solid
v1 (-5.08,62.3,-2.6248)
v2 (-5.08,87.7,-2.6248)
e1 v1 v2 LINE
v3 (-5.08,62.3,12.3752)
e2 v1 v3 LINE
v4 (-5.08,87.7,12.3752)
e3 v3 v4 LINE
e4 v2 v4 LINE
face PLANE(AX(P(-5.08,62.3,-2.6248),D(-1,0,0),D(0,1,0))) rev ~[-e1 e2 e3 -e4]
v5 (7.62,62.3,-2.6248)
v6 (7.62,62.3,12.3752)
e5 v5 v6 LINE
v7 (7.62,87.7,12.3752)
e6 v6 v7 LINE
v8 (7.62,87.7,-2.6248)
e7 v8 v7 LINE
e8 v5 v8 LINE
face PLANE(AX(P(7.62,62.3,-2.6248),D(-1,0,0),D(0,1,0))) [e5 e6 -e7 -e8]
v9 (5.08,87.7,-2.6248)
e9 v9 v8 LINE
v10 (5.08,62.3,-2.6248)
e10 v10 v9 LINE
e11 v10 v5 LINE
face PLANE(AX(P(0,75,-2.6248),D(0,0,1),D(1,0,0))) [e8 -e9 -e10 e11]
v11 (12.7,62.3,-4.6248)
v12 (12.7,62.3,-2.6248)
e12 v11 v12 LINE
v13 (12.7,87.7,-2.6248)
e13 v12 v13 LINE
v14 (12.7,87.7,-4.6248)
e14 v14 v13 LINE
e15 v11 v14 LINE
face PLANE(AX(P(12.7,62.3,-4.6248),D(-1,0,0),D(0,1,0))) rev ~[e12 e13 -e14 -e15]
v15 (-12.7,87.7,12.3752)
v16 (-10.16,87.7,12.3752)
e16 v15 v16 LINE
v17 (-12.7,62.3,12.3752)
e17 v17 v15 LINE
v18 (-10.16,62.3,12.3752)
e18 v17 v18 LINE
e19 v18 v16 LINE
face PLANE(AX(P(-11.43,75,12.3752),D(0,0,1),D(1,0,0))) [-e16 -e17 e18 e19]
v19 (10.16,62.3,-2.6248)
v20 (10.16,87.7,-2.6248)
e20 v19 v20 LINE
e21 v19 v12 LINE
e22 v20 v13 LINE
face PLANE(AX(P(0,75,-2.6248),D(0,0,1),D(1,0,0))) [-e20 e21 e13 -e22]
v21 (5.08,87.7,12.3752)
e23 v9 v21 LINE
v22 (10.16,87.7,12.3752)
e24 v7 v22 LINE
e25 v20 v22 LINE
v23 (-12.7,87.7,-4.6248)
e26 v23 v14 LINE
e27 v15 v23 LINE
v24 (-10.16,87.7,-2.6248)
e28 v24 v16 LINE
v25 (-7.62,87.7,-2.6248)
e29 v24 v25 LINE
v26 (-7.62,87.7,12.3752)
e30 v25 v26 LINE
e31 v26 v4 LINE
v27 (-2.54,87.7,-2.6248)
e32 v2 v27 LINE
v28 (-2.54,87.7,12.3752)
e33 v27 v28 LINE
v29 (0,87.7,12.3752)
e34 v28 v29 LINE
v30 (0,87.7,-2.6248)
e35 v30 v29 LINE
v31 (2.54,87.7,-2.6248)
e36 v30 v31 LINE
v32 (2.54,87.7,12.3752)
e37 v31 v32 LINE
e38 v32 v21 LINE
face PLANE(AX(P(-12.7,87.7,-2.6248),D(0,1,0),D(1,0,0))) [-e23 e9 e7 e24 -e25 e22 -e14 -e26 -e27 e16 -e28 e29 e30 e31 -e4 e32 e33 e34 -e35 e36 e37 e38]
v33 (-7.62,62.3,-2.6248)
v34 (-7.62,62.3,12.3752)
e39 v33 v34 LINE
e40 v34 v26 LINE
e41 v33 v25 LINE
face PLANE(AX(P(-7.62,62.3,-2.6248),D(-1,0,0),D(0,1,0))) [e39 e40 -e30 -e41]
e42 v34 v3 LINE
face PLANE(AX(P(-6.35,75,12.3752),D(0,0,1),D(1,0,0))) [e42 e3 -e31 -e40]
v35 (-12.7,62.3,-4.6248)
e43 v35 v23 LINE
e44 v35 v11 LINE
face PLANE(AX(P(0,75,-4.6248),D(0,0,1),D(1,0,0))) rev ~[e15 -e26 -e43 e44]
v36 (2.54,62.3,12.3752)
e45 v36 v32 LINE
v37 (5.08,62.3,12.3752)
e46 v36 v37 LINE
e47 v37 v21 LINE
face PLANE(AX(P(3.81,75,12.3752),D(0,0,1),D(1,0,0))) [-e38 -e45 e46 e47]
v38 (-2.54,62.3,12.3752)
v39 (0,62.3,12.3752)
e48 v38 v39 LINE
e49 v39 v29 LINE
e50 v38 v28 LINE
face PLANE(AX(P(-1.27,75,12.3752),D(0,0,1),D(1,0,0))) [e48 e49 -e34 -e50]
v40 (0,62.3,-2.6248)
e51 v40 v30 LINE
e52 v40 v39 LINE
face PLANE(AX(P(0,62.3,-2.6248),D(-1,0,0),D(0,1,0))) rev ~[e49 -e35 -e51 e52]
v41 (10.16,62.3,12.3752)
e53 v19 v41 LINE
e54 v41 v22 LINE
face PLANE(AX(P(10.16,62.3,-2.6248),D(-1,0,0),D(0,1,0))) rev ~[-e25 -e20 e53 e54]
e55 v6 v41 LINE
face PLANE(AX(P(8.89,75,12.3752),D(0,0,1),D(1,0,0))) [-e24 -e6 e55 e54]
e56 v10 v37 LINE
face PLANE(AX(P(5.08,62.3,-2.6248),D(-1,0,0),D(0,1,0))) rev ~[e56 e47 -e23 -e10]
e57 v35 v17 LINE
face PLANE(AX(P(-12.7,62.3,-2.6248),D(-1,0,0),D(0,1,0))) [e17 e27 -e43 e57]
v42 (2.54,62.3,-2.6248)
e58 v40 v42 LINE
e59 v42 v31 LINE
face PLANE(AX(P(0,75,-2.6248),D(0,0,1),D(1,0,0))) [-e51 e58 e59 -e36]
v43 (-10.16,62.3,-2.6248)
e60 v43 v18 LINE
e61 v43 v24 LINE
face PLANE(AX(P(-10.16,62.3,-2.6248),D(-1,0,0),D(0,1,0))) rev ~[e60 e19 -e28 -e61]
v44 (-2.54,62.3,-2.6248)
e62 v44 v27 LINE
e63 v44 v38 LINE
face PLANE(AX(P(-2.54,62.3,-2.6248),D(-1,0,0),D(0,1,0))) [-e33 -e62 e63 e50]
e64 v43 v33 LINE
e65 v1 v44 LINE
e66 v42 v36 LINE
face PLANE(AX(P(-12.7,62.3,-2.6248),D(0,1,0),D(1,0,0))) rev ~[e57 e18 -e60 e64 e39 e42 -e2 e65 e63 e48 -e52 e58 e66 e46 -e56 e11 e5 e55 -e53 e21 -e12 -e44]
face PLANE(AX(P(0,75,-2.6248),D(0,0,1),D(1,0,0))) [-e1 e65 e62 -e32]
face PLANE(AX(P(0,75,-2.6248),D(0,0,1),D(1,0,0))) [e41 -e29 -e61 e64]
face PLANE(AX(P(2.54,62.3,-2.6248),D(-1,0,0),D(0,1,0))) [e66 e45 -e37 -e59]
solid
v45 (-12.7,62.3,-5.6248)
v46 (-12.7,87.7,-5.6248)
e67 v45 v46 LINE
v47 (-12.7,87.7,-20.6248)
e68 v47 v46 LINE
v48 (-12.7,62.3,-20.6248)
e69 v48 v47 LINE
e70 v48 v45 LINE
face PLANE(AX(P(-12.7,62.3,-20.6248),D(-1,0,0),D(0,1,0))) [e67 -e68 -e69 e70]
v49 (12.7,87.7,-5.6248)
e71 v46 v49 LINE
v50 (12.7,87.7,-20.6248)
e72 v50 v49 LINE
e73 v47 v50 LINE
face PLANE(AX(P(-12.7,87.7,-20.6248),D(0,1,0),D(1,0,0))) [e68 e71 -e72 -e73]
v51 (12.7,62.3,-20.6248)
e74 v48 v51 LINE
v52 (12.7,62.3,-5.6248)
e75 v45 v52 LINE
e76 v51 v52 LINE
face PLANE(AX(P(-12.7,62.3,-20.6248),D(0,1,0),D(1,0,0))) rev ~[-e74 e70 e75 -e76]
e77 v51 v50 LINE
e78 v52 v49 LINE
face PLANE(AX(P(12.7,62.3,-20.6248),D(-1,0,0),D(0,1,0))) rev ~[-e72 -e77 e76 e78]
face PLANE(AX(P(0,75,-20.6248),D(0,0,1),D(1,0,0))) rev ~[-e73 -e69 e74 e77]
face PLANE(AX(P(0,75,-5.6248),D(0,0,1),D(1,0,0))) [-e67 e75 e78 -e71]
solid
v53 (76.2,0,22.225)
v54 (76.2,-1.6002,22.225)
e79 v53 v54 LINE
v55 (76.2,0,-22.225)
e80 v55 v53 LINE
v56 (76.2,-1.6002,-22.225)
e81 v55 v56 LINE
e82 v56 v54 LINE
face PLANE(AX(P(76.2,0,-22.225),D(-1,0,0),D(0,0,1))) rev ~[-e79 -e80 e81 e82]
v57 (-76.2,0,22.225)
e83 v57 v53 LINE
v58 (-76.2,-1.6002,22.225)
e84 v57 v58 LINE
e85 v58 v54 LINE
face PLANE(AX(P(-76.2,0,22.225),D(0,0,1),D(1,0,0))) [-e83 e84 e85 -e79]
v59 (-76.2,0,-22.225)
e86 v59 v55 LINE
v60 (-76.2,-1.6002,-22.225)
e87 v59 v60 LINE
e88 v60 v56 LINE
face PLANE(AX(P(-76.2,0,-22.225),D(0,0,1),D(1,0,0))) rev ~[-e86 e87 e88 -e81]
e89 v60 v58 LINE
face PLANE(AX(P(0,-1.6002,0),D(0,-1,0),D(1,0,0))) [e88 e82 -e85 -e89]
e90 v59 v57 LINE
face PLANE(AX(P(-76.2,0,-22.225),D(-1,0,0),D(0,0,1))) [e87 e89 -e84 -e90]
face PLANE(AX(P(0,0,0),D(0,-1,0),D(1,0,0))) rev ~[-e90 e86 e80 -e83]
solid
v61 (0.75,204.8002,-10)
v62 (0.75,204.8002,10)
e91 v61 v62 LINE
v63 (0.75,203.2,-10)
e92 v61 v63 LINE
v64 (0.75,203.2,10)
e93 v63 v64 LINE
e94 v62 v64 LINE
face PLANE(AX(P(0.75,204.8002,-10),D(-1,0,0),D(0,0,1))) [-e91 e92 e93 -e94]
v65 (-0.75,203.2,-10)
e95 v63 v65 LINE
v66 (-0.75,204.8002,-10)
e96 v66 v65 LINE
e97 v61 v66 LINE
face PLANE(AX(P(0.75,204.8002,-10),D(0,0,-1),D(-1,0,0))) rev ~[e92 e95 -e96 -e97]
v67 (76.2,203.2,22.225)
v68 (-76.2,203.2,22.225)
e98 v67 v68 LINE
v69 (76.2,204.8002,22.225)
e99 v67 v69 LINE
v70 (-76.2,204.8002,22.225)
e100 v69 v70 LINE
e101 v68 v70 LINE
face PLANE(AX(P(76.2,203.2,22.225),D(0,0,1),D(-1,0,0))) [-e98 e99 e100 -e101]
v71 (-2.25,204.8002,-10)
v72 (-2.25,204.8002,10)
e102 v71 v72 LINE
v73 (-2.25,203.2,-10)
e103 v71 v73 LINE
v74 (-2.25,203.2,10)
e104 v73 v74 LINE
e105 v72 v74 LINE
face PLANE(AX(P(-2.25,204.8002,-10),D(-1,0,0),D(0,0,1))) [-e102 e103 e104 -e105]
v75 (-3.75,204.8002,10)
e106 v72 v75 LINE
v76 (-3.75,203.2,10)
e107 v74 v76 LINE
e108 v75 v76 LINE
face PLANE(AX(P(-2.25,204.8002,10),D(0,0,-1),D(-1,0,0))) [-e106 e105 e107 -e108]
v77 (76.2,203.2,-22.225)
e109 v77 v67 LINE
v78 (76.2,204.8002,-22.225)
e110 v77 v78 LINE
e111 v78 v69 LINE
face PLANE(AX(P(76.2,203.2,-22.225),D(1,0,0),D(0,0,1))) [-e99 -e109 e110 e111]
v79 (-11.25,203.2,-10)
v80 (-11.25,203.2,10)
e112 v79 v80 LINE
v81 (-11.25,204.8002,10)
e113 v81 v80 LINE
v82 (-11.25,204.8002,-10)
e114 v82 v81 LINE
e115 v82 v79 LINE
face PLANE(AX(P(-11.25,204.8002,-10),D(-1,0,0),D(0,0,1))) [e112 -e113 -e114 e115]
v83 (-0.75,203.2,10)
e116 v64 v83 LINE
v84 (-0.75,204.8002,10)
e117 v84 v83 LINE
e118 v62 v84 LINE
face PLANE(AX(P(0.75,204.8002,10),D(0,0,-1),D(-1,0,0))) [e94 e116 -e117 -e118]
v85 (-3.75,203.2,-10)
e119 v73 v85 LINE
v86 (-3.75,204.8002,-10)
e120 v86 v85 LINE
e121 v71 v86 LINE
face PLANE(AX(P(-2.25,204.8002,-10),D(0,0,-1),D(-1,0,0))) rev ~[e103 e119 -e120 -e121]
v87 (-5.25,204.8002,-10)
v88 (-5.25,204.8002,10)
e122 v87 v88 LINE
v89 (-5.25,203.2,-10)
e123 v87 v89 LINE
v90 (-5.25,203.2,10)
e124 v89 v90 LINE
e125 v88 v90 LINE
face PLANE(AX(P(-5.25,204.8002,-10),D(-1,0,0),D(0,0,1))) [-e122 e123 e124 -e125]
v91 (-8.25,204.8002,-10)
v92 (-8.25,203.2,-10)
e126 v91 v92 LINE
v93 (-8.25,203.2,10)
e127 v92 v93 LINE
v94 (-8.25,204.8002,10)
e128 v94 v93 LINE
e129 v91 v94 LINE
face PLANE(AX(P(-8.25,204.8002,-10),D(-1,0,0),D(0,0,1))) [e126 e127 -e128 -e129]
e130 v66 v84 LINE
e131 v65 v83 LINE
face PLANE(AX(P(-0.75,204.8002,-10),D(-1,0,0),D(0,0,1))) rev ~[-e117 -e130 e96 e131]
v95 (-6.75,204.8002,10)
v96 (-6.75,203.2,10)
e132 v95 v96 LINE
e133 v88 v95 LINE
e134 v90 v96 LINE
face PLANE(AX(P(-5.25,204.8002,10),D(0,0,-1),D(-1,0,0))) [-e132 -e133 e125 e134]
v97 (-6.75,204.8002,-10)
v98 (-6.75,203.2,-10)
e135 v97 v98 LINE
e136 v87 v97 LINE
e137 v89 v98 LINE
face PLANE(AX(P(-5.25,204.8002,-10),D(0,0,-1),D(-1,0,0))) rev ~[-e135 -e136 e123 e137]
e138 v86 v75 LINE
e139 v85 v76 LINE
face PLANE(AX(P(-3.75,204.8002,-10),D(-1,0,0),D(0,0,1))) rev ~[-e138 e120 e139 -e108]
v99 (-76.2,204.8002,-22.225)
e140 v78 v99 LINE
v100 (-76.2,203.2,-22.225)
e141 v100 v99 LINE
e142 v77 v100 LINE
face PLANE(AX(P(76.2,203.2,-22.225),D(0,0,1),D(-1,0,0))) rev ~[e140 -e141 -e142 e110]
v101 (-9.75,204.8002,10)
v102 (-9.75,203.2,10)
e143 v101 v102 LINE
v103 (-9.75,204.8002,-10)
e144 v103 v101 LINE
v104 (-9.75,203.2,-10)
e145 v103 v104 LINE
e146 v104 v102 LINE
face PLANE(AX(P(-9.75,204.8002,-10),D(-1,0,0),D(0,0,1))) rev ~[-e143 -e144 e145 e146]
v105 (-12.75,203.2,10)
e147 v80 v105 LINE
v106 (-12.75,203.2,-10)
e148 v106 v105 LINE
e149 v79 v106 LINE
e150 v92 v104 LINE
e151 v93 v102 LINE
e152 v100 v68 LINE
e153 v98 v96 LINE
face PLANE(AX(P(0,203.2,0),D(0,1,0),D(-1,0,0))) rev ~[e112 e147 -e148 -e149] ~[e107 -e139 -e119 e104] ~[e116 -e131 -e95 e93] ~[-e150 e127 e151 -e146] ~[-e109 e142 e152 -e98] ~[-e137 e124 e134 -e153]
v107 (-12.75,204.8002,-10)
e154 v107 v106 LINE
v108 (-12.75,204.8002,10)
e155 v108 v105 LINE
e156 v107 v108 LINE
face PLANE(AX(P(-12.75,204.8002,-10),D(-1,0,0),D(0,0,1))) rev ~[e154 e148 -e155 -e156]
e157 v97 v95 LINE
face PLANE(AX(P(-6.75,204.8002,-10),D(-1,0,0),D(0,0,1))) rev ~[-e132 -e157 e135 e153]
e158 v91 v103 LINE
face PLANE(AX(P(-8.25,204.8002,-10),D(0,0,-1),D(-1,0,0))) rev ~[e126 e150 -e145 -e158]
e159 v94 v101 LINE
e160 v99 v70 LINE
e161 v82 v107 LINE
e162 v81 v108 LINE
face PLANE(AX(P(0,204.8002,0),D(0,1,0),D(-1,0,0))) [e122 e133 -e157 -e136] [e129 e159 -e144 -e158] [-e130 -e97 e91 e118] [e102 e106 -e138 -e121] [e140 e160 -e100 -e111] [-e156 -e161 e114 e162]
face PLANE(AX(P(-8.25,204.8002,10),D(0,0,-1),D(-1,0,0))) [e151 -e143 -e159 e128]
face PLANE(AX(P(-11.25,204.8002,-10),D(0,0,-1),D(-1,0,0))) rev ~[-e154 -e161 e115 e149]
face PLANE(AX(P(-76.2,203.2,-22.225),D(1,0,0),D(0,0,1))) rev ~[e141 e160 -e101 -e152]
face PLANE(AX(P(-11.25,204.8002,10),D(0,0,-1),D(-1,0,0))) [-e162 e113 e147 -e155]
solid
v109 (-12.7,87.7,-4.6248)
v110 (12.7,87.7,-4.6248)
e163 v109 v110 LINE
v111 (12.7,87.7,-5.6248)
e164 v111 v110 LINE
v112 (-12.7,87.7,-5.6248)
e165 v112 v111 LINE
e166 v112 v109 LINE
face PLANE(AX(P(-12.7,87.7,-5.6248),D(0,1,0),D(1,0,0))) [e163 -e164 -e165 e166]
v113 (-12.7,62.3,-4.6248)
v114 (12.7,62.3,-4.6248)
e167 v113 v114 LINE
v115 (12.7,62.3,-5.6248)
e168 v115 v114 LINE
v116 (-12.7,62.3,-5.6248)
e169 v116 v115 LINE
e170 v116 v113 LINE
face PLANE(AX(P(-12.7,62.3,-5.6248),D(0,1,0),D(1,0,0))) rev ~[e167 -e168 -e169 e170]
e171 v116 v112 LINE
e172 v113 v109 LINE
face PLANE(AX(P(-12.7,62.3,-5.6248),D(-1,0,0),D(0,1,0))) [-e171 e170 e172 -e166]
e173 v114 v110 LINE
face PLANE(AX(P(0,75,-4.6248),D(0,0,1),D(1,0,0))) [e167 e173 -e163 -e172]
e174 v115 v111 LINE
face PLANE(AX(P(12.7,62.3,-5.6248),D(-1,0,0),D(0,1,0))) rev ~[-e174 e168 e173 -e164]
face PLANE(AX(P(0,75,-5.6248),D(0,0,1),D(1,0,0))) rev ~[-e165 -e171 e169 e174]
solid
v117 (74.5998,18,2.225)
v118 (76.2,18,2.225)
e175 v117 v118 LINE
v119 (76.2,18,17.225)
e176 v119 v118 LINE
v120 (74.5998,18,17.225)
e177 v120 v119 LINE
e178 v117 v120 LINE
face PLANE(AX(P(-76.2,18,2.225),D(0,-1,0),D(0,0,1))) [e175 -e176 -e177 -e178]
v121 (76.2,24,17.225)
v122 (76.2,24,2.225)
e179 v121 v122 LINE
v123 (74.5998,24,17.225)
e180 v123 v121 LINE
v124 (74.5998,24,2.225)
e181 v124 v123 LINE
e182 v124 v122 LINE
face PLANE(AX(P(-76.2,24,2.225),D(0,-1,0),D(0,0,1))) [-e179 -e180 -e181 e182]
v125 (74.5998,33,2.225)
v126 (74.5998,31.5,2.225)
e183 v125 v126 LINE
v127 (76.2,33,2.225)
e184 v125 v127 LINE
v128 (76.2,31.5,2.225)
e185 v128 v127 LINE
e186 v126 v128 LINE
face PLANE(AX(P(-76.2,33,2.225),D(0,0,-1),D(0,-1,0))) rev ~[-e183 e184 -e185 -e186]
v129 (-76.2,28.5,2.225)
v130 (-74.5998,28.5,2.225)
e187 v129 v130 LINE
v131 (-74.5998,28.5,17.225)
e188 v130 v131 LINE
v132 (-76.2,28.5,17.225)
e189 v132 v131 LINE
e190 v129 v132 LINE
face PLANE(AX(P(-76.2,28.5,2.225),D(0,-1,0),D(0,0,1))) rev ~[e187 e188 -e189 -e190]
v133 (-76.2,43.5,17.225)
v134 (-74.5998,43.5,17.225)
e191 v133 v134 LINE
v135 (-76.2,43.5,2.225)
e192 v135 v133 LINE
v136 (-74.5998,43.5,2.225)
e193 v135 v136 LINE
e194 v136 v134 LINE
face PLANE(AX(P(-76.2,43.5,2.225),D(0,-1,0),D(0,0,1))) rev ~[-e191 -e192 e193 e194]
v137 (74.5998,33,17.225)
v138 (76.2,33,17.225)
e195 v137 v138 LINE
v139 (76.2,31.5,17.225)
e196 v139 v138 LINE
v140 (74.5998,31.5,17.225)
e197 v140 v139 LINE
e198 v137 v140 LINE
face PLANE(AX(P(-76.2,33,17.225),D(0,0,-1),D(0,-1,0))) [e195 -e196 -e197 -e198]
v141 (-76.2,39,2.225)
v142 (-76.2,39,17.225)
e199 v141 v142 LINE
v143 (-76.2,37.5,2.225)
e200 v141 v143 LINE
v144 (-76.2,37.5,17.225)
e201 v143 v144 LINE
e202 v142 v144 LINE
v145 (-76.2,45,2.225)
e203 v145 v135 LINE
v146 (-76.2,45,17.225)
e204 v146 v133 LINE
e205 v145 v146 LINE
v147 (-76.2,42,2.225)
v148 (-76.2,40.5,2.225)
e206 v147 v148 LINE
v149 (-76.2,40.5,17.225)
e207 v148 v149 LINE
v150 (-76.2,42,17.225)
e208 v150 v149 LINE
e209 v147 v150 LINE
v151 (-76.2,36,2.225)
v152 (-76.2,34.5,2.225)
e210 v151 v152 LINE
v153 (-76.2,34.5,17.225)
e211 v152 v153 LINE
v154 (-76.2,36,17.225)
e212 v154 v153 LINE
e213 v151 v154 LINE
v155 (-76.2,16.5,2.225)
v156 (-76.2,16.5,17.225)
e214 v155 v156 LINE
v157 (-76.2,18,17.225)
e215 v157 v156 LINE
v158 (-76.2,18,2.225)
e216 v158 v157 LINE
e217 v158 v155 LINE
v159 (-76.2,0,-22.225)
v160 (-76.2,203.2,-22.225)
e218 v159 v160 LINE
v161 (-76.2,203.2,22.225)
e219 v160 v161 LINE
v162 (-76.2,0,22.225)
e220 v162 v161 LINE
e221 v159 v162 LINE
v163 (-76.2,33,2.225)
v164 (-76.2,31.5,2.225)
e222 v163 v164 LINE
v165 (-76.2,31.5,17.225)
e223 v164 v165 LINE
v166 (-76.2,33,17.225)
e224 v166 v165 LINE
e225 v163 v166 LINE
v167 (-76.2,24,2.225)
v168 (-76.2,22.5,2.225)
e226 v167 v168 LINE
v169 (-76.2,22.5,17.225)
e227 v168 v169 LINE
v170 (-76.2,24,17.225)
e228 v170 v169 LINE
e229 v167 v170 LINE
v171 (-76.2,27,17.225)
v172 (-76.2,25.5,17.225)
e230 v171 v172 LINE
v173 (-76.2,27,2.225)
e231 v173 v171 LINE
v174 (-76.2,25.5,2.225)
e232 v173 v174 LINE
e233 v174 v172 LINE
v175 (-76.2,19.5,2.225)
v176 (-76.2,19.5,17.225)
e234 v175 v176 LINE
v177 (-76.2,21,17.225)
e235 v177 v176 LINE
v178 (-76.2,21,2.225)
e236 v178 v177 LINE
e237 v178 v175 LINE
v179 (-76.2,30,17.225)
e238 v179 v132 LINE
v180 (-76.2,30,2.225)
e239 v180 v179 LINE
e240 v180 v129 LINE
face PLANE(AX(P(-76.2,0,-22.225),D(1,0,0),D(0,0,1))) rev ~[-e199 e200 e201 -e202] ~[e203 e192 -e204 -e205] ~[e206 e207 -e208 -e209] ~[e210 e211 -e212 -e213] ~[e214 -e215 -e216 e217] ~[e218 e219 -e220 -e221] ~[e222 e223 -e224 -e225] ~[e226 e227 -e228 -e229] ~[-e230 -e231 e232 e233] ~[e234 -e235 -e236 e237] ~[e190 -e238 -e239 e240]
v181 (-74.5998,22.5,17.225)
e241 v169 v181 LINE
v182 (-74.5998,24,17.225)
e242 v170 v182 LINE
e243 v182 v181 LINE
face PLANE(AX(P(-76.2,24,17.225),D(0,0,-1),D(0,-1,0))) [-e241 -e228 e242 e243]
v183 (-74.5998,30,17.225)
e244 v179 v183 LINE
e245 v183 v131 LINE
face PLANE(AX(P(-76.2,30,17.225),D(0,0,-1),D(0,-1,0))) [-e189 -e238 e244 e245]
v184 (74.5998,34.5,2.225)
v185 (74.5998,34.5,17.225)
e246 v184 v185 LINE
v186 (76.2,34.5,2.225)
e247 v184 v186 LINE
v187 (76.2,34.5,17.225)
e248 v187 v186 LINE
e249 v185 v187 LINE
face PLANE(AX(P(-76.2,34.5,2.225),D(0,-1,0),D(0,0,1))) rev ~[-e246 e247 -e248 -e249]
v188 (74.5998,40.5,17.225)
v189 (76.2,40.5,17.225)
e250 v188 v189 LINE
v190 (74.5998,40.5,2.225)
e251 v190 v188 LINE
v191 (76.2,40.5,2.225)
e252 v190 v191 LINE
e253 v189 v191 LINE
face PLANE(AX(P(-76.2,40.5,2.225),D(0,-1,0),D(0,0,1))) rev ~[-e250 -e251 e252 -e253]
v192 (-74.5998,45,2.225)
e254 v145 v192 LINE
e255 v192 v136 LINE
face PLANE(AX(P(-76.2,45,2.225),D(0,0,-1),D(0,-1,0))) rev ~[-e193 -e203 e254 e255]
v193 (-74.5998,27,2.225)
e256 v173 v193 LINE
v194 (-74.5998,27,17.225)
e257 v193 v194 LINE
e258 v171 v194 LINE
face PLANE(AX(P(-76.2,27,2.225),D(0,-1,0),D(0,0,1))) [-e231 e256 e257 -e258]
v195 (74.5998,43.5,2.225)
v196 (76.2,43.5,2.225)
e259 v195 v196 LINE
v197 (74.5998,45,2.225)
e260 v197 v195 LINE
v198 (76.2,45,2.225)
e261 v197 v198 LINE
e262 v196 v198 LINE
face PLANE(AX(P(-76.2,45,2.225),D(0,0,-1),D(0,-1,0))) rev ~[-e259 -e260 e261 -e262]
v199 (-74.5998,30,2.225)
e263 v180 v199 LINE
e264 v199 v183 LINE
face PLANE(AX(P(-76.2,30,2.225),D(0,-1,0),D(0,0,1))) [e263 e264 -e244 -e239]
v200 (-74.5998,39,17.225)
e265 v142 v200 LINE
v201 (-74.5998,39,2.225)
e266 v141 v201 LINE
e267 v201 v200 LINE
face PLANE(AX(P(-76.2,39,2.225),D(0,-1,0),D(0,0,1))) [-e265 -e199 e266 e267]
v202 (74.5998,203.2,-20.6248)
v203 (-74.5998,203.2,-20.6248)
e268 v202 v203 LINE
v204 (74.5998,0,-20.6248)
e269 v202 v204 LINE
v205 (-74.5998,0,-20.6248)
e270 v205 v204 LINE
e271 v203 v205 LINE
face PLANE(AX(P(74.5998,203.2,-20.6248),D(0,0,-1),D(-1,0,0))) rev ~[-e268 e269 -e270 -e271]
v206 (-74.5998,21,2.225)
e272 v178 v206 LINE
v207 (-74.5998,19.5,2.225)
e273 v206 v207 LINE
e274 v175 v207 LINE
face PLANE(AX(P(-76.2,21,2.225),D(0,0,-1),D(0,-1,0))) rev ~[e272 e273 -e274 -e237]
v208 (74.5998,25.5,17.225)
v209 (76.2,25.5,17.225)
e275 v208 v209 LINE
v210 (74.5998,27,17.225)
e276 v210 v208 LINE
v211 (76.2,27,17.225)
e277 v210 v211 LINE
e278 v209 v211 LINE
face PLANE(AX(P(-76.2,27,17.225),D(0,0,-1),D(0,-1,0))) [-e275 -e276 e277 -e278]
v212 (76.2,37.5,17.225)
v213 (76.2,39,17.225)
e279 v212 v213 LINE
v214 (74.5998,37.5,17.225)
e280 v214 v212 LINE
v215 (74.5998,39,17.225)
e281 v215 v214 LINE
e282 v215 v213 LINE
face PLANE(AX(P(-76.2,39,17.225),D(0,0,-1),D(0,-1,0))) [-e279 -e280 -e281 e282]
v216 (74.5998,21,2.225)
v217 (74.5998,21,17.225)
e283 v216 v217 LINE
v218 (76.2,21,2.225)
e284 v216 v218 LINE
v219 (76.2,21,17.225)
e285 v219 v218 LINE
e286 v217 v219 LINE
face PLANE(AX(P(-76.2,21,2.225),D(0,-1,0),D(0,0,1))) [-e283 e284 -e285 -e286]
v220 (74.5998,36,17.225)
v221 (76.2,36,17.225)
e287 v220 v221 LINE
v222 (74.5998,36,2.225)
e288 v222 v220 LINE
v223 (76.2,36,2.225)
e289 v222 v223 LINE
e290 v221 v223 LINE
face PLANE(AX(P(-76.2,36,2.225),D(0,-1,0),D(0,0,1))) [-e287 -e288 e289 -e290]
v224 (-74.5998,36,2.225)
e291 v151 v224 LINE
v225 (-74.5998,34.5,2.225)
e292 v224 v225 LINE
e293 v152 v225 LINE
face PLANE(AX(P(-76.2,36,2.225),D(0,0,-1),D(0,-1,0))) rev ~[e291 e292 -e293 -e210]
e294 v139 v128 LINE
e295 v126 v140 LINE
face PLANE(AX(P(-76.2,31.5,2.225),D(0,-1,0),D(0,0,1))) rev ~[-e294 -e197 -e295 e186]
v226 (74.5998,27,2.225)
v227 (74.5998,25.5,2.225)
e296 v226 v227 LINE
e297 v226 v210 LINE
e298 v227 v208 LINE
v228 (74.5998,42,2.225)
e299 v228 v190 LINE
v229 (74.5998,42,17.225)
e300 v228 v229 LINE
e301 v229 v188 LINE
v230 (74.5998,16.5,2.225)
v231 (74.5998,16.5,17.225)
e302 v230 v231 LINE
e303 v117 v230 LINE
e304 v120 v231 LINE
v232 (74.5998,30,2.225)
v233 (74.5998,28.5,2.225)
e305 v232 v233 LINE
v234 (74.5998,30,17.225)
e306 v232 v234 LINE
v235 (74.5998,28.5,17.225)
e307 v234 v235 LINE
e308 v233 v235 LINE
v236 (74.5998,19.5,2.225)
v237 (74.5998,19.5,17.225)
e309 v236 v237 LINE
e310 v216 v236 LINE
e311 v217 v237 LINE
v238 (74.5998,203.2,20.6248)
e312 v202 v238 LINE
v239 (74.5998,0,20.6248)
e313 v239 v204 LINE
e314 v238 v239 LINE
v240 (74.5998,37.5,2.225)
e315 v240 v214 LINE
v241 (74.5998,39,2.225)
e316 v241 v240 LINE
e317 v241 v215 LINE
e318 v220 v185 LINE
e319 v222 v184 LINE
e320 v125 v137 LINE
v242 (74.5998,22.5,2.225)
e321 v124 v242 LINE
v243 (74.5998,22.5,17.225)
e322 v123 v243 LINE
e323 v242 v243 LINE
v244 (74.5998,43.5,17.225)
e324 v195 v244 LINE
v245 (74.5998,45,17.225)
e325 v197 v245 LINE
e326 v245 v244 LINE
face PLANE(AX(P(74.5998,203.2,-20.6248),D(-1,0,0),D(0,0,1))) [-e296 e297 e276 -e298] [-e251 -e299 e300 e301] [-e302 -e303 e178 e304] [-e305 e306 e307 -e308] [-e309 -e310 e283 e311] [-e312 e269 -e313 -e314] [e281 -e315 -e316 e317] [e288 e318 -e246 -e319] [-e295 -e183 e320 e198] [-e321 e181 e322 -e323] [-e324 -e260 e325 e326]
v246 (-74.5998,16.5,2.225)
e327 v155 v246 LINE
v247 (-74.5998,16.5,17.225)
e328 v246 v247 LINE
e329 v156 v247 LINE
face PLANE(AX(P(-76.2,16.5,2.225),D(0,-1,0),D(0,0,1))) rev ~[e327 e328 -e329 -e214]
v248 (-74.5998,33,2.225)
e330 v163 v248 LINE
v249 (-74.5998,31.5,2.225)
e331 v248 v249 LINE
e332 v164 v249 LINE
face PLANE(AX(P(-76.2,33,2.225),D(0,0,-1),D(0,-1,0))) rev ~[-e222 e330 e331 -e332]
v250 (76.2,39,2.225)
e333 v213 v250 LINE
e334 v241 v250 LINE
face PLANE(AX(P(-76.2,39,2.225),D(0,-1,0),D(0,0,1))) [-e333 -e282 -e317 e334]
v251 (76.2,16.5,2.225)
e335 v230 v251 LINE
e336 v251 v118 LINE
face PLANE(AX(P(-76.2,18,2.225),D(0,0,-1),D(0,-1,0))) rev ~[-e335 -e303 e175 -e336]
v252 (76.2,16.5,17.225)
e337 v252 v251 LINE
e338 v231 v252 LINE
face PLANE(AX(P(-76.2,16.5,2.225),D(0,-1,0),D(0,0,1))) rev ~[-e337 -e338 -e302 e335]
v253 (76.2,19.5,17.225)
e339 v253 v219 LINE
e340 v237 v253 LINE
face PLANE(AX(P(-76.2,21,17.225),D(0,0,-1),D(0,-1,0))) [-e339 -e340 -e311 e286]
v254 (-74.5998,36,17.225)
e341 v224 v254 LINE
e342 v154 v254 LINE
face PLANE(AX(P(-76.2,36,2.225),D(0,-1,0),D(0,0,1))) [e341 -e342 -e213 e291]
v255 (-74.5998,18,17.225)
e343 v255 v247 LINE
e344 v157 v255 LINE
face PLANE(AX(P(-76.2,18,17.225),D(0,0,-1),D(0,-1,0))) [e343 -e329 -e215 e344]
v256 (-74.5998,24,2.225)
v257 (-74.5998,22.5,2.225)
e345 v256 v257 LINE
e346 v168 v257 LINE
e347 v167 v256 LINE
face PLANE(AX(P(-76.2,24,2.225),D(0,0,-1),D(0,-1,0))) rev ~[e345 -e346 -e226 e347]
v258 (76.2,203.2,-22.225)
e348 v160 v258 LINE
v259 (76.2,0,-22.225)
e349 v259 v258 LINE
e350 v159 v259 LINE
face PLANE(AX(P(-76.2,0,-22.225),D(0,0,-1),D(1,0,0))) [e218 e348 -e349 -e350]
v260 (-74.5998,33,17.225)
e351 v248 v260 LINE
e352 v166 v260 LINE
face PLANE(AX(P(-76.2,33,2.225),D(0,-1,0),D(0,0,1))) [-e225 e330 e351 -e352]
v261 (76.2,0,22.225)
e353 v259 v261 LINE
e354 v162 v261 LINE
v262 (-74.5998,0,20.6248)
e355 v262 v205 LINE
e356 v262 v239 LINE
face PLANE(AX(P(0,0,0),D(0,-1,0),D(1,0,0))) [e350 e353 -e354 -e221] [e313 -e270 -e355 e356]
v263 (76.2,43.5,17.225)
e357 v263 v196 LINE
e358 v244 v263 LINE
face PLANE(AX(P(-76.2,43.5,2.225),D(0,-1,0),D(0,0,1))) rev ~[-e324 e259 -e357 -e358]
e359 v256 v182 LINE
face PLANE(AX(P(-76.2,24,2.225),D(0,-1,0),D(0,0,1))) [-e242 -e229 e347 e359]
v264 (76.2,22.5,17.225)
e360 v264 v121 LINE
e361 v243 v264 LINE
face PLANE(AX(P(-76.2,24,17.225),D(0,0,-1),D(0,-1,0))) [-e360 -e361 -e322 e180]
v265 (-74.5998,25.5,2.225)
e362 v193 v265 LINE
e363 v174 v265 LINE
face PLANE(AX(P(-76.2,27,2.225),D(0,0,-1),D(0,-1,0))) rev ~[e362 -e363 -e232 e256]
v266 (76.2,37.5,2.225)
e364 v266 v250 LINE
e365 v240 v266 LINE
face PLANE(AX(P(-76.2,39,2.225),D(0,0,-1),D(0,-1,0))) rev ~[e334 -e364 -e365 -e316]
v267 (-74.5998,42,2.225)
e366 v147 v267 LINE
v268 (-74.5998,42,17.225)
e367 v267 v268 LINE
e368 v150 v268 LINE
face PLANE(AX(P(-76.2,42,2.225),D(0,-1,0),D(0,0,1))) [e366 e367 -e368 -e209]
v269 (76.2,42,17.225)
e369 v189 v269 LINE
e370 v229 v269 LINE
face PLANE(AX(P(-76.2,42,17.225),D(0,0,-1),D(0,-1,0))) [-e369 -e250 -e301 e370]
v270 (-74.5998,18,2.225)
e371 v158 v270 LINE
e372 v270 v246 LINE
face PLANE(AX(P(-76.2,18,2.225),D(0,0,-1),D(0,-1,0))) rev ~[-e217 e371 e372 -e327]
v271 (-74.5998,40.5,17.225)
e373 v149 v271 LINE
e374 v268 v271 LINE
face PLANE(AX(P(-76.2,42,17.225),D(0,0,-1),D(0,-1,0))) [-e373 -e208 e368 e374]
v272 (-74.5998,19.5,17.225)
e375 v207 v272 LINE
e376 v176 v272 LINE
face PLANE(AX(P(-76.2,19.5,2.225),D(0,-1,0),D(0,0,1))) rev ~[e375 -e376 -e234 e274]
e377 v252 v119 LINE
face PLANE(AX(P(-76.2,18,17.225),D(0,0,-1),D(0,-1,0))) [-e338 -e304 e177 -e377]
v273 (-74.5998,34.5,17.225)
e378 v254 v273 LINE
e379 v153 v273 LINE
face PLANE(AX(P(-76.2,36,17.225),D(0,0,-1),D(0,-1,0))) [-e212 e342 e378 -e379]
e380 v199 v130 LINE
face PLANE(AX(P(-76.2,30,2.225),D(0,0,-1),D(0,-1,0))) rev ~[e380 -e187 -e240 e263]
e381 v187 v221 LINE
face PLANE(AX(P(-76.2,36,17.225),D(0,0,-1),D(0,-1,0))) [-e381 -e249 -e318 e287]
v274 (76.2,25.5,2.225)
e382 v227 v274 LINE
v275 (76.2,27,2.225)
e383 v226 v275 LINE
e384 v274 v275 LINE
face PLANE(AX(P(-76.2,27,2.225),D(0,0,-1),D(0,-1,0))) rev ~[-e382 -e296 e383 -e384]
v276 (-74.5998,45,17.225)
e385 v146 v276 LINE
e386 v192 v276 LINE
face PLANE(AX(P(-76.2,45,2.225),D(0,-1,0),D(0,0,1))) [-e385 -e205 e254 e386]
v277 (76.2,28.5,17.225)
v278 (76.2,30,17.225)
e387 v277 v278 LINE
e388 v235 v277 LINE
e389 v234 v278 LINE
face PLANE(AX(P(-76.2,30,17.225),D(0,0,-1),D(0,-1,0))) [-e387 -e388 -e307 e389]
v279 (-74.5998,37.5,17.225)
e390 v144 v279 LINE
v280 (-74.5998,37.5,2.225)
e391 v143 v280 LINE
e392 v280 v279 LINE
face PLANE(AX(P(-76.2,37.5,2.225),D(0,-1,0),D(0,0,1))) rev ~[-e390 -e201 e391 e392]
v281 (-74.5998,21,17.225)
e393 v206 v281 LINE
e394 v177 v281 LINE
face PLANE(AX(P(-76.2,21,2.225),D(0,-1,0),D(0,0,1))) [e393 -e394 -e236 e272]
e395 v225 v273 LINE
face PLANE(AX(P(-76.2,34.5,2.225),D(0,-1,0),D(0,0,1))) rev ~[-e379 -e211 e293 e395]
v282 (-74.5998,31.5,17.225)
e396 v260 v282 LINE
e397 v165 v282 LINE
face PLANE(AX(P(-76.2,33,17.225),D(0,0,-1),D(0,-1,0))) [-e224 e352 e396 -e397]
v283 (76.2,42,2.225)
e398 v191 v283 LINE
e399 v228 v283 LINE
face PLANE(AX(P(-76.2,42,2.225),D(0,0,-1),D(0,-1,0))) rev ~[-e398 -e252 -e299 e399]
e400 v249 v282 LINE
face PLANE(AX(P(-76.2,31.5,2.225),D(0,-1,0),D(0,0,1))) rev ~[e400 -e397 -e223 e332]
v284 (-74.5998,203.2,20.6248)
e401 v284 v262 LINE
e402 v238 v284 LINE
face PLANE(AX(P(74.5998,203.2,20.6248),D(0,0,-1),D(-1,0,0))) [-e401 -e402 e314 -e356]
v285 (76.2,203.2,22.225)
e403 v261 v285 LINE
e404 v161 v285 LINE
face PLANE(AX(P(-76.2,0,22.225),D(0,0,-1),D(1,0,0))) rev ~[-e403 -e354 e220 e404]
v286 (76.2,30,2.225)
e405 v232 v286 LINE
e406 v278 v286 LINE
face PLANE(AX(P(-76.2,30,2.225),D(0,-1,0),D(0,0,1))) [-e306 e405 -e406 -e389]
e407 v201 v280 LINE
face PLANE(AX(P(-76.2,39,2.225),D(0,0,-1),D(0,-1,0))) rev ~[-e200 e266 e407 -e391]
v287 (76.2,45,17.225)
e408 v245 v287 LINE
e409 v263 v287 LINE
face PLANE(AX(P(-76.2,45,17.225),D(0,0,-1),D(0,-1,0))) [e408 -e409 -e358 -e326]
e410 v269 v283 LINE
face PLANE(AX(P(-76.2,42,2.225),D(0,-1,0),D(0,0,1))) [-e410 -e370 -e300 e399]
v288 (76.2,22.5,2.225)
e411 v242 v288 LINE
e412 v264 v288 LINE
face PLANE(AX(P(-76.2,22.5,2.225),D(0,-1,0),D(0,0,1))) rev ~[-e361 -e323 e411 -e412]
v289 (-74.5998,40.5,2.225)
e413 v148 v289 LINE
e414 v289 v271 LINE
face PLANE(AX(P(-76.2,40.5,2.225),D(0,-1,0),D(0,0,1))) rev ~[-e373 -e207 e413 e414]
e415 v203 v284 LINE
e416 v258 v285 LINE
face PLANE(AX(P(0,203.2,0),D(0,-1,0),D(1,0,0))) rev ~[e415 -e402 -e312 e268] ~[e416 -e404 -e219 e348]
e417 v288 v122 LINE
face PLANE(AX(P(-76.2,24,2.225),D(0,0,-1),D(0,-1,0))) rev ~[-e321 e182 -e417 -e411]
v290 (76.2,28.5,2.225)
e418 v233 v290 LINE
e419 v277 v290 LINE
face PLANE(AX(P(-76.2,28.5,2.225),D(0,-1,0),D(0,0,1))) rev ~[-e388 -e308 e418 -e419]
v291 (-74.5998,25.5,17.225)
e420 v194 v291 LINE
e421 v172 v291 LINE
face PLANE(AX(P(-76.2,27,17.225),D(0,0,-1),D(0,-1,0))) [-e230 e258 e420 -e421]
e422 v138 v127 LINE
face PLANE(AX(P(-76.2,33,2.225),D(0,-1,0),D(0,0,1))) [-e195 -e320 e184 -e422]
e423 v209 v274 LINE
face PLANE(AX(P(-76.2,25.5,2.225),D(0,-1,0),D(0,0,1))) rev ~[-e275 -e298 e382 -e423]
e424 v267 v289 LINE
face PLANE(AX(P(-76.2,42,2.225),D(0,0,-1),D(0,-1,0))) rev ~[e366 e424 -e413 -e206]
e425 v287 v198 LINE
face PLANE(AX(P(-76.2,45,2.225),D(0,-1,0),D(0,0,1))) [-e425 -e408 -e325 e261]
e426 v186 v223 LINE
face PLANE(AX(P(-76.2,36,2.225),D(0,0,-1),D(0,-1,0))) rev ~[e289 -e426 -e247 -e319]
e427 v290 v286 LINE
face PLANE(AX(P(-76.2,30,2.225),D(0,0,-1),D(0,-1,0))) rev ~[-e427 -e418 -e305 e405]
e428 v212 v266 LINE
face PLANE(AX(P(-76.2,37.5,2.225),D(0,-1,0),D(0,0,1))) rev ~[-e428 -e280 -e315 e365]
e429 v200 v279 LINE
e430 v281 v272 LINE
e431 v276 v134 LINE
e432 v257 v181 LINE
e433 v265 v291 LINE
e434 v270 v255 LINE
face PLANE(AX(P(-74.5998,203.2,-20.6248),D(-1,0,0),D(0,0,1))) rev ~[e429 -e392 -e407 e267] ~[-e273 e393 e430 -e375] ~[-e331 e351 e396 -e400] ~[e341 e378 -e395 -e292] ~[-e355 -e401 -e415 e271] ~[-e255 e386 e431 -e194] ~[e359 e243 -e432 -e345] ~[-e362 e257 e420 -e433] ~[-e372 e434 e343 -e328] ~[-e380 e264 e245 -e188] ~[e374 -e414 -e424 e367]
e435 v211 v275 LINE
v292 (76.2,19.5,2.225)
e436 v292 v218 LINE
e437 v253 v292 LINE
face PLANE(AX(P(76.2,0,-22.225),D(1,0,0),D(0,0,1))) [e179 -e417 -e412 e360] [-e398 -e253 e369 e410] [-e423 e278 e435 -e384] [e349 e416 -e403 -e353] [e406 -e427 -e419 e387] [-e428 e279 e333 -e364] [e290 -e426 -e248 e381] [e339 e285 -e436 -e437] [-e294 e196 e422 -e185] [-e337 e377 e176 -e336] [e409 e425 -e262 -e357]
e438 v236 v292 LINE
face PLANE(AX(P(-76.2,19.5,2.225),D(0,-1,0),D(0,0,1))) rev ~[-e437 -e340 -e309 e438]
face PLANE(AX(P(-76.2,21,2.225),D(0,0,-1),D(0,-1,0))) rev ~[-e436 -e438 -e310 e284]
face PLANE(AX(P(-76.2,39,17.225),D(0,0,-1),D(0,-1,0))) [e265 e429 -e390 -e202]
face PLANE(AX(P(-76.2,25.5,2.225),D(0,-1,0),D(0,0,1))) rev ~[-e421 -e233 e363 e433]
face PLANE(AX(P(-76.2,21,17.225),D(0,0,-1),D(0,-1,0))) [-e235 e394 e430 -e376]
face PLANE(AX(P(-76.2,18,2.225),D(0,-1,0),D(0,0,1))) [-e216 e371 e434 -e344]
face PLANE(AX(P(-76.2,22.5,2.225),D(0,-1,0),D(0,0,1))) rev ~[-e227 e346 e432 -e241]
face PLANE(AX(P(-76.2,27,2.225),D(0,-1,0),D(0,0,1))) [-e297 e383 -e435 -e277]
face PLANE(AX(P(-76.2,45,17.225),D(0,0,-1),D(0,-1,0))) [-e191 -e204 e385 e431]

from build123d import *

# Parameters (mm, degrees)
F0_W      = 152.4
F0_H      = 44.45
F1_DEPTH  = 203.2
F2_W      = 149.1996
F2_H      = 41.2496
F3_DEPTH  = 203.201
F7_W      = 152.4
F7_H      = 44.45
F8_DEPTH  = 1.6002
F9_W      = 152.4
F9_H      = 44.45
F10_DEPTH = 1.6002
F11_W     = 1.5
F11_H     = 15
F12_DEPTH = 152.401
F13_W     = 25.4
F13_H     = 25.4
F14_DEPTH = 15
F15_W     = 25.4
F15_H     = 25.4
F16_DEPTH = 1
F17_W     = 25.4
F17_H     = 25.4
F18_DEPTH = 2
F19_W     = 2.54
F19_H     = 25.4
F20_DEPTH = 15
F21_W     = 1.5
F21_H     = 20
F22_DEPTH = 25


# Not quite as in the source:
# - a feature of the source that left no trace in its solid (it failed there, or was rolled back) is left out


with BuildPart() as f1:
    # F0 (on Front) → F1 (new body)
    with BuildSketch(Plane.XZ):
        Rectangle(F0_W, F0_H)
    extrude(amount=-F1_DEPTH)

    # F2 (on face) → F3 (cut, through all)
    with BuildSketch(Plane(origin=(0, 203.2, 0), x_dir=(-1, 0, 0), z_dir=(0, 1, 0))):
        Rectangle(F2_W, F2_H)
    extrude(amount=-F3_DEPTH, mode=Mode.SUBTRACT)

    # F11 (on face) → F12 (cut, through all)
    with BuildSketch(Plane(origin=(-76.2, 0, 0), x_dir=(0, -1, 0), z_dir=(-1, 0, 0))):
        with Locations((-44.25, 9.725)):
            Rectangle(F11_W, F11_H)
        with Locations((-41.25, 9.725)):
            Rectangle(F11_W, F11_H)
        with Locations((-38.25, 9.725)):
            Rectangle(F11_W, F11_H)
        with Locations((-35.25, 9.725)):
            Rectangle(F11_W, F11_H)
        with Locations((-32.25, 9.725)):
            Rectangle(F11_W, F11_H)
        with Locations((-29.25, 9.725)):
            Rectangle(F11_W, F11_H)
        with Locations((-26.25, 9.725)):
            Rectangle(F11_W, F11_H)
        with Locations((-23.25, 9.725)):
            Rectangle(F11_W, F11_H)
        with Locations((-20.25, 9.725)):
            Rectangle(F11_W, F11_H)
        with Locations((-17.25, 9.725)):
            Rectangle(F11_W, F11_H)
    extrude(amount=-F12_DEPTH, mode=Mode.SUBTRACT)


with BuildPart() as f8:
    # F7 (on face) → F8 (new body)
    with BuildSketch(Plane(origin=(0, 203.2, 0), x_dir=(-1, 0, 0), z_dir=(0, 1, 0))):
        Rectangle(F7_W, F7_H)
    extrude(amount=F8_DEPTH)

    # F21 (on face) → F22 (cut)
    with BuildSketch(Plane(origin=(0, 204.8002, 0), x_dir=(-1, 0, 0), z_dir=(0, 1, 0))):
        Rectangle(F21_W, F21_H)
        with Locations((3, 0)):
            Rectangle(F21_W, F21_H)
        with Locations((6, 0)):
            Rectangle(F21_W, F21_H)
        with Locations((9, 0)):
            Rectangle(F21_W, F21_H)
        with Locations((12, 0)):
            Rectangle(F21_W, F21_H)
    extrude(amount=-F22_DEPTH, mode=Mode.SUBTRACT)


with BuildPart() as f10:
    # F9 (on face) → F10 (new body)
    with BuildSketch(Plane.XZ):
        Rectangle(F9_W, F9_H)
    extrude(amount=F10_DEPTH)


with BuildPart() as f14:
    # F13 (on face) → F14 (new body)
    with BuildSketch(Plane.XY.offset(-20.6248)):
        with Locations((0, 75)):
            Rectangle(F13_W, F13_H)
    extrude(amount=F14_DEPTH)


with BuildPart() as f16:
    # F15 (on face) → F16 (new body)
    with BuildSketch(Plane.XY.offset(-5.6248)):
        with Locations((0, 75)):
            Rectangle(F15_W, F15_H)
    extrude(amount=F16_DEPTH)


with BuildPart() as f18:
    # F17 (on face) → F18 (new body)
    with BuildSketch(Plane.XY.offset(-4.6248)):
        with Locations((0, 75)):
            Rectangle(F17_W, F17_H)
    extrude(amount=F18_DEPTH)

    # F19 (on face) → F20 (join)
    with BuildSketch(Plane.XY.offset(-2.6248)):
        with Locations((-11.43, 75)):
            Rectangle(F19_W, F19_H)
        with Locations((-6.35, 75)):
            Rectangle(F19_W, F19_H)
        with Locations((-1.27, 75)):
            Rectangle(F19_W, F19_H)
        with Locations((3.81, 75)):
            Rectangle(F19_W, F19_H)
        with Locations((8.89, 75)):
            Rectangle(F19_W, F19_H)
    extrude(amount=F20_DEPTH)


solid = Compound([f1.part, f8.part, f10.part, f14.part, f16.part, f18.part])
